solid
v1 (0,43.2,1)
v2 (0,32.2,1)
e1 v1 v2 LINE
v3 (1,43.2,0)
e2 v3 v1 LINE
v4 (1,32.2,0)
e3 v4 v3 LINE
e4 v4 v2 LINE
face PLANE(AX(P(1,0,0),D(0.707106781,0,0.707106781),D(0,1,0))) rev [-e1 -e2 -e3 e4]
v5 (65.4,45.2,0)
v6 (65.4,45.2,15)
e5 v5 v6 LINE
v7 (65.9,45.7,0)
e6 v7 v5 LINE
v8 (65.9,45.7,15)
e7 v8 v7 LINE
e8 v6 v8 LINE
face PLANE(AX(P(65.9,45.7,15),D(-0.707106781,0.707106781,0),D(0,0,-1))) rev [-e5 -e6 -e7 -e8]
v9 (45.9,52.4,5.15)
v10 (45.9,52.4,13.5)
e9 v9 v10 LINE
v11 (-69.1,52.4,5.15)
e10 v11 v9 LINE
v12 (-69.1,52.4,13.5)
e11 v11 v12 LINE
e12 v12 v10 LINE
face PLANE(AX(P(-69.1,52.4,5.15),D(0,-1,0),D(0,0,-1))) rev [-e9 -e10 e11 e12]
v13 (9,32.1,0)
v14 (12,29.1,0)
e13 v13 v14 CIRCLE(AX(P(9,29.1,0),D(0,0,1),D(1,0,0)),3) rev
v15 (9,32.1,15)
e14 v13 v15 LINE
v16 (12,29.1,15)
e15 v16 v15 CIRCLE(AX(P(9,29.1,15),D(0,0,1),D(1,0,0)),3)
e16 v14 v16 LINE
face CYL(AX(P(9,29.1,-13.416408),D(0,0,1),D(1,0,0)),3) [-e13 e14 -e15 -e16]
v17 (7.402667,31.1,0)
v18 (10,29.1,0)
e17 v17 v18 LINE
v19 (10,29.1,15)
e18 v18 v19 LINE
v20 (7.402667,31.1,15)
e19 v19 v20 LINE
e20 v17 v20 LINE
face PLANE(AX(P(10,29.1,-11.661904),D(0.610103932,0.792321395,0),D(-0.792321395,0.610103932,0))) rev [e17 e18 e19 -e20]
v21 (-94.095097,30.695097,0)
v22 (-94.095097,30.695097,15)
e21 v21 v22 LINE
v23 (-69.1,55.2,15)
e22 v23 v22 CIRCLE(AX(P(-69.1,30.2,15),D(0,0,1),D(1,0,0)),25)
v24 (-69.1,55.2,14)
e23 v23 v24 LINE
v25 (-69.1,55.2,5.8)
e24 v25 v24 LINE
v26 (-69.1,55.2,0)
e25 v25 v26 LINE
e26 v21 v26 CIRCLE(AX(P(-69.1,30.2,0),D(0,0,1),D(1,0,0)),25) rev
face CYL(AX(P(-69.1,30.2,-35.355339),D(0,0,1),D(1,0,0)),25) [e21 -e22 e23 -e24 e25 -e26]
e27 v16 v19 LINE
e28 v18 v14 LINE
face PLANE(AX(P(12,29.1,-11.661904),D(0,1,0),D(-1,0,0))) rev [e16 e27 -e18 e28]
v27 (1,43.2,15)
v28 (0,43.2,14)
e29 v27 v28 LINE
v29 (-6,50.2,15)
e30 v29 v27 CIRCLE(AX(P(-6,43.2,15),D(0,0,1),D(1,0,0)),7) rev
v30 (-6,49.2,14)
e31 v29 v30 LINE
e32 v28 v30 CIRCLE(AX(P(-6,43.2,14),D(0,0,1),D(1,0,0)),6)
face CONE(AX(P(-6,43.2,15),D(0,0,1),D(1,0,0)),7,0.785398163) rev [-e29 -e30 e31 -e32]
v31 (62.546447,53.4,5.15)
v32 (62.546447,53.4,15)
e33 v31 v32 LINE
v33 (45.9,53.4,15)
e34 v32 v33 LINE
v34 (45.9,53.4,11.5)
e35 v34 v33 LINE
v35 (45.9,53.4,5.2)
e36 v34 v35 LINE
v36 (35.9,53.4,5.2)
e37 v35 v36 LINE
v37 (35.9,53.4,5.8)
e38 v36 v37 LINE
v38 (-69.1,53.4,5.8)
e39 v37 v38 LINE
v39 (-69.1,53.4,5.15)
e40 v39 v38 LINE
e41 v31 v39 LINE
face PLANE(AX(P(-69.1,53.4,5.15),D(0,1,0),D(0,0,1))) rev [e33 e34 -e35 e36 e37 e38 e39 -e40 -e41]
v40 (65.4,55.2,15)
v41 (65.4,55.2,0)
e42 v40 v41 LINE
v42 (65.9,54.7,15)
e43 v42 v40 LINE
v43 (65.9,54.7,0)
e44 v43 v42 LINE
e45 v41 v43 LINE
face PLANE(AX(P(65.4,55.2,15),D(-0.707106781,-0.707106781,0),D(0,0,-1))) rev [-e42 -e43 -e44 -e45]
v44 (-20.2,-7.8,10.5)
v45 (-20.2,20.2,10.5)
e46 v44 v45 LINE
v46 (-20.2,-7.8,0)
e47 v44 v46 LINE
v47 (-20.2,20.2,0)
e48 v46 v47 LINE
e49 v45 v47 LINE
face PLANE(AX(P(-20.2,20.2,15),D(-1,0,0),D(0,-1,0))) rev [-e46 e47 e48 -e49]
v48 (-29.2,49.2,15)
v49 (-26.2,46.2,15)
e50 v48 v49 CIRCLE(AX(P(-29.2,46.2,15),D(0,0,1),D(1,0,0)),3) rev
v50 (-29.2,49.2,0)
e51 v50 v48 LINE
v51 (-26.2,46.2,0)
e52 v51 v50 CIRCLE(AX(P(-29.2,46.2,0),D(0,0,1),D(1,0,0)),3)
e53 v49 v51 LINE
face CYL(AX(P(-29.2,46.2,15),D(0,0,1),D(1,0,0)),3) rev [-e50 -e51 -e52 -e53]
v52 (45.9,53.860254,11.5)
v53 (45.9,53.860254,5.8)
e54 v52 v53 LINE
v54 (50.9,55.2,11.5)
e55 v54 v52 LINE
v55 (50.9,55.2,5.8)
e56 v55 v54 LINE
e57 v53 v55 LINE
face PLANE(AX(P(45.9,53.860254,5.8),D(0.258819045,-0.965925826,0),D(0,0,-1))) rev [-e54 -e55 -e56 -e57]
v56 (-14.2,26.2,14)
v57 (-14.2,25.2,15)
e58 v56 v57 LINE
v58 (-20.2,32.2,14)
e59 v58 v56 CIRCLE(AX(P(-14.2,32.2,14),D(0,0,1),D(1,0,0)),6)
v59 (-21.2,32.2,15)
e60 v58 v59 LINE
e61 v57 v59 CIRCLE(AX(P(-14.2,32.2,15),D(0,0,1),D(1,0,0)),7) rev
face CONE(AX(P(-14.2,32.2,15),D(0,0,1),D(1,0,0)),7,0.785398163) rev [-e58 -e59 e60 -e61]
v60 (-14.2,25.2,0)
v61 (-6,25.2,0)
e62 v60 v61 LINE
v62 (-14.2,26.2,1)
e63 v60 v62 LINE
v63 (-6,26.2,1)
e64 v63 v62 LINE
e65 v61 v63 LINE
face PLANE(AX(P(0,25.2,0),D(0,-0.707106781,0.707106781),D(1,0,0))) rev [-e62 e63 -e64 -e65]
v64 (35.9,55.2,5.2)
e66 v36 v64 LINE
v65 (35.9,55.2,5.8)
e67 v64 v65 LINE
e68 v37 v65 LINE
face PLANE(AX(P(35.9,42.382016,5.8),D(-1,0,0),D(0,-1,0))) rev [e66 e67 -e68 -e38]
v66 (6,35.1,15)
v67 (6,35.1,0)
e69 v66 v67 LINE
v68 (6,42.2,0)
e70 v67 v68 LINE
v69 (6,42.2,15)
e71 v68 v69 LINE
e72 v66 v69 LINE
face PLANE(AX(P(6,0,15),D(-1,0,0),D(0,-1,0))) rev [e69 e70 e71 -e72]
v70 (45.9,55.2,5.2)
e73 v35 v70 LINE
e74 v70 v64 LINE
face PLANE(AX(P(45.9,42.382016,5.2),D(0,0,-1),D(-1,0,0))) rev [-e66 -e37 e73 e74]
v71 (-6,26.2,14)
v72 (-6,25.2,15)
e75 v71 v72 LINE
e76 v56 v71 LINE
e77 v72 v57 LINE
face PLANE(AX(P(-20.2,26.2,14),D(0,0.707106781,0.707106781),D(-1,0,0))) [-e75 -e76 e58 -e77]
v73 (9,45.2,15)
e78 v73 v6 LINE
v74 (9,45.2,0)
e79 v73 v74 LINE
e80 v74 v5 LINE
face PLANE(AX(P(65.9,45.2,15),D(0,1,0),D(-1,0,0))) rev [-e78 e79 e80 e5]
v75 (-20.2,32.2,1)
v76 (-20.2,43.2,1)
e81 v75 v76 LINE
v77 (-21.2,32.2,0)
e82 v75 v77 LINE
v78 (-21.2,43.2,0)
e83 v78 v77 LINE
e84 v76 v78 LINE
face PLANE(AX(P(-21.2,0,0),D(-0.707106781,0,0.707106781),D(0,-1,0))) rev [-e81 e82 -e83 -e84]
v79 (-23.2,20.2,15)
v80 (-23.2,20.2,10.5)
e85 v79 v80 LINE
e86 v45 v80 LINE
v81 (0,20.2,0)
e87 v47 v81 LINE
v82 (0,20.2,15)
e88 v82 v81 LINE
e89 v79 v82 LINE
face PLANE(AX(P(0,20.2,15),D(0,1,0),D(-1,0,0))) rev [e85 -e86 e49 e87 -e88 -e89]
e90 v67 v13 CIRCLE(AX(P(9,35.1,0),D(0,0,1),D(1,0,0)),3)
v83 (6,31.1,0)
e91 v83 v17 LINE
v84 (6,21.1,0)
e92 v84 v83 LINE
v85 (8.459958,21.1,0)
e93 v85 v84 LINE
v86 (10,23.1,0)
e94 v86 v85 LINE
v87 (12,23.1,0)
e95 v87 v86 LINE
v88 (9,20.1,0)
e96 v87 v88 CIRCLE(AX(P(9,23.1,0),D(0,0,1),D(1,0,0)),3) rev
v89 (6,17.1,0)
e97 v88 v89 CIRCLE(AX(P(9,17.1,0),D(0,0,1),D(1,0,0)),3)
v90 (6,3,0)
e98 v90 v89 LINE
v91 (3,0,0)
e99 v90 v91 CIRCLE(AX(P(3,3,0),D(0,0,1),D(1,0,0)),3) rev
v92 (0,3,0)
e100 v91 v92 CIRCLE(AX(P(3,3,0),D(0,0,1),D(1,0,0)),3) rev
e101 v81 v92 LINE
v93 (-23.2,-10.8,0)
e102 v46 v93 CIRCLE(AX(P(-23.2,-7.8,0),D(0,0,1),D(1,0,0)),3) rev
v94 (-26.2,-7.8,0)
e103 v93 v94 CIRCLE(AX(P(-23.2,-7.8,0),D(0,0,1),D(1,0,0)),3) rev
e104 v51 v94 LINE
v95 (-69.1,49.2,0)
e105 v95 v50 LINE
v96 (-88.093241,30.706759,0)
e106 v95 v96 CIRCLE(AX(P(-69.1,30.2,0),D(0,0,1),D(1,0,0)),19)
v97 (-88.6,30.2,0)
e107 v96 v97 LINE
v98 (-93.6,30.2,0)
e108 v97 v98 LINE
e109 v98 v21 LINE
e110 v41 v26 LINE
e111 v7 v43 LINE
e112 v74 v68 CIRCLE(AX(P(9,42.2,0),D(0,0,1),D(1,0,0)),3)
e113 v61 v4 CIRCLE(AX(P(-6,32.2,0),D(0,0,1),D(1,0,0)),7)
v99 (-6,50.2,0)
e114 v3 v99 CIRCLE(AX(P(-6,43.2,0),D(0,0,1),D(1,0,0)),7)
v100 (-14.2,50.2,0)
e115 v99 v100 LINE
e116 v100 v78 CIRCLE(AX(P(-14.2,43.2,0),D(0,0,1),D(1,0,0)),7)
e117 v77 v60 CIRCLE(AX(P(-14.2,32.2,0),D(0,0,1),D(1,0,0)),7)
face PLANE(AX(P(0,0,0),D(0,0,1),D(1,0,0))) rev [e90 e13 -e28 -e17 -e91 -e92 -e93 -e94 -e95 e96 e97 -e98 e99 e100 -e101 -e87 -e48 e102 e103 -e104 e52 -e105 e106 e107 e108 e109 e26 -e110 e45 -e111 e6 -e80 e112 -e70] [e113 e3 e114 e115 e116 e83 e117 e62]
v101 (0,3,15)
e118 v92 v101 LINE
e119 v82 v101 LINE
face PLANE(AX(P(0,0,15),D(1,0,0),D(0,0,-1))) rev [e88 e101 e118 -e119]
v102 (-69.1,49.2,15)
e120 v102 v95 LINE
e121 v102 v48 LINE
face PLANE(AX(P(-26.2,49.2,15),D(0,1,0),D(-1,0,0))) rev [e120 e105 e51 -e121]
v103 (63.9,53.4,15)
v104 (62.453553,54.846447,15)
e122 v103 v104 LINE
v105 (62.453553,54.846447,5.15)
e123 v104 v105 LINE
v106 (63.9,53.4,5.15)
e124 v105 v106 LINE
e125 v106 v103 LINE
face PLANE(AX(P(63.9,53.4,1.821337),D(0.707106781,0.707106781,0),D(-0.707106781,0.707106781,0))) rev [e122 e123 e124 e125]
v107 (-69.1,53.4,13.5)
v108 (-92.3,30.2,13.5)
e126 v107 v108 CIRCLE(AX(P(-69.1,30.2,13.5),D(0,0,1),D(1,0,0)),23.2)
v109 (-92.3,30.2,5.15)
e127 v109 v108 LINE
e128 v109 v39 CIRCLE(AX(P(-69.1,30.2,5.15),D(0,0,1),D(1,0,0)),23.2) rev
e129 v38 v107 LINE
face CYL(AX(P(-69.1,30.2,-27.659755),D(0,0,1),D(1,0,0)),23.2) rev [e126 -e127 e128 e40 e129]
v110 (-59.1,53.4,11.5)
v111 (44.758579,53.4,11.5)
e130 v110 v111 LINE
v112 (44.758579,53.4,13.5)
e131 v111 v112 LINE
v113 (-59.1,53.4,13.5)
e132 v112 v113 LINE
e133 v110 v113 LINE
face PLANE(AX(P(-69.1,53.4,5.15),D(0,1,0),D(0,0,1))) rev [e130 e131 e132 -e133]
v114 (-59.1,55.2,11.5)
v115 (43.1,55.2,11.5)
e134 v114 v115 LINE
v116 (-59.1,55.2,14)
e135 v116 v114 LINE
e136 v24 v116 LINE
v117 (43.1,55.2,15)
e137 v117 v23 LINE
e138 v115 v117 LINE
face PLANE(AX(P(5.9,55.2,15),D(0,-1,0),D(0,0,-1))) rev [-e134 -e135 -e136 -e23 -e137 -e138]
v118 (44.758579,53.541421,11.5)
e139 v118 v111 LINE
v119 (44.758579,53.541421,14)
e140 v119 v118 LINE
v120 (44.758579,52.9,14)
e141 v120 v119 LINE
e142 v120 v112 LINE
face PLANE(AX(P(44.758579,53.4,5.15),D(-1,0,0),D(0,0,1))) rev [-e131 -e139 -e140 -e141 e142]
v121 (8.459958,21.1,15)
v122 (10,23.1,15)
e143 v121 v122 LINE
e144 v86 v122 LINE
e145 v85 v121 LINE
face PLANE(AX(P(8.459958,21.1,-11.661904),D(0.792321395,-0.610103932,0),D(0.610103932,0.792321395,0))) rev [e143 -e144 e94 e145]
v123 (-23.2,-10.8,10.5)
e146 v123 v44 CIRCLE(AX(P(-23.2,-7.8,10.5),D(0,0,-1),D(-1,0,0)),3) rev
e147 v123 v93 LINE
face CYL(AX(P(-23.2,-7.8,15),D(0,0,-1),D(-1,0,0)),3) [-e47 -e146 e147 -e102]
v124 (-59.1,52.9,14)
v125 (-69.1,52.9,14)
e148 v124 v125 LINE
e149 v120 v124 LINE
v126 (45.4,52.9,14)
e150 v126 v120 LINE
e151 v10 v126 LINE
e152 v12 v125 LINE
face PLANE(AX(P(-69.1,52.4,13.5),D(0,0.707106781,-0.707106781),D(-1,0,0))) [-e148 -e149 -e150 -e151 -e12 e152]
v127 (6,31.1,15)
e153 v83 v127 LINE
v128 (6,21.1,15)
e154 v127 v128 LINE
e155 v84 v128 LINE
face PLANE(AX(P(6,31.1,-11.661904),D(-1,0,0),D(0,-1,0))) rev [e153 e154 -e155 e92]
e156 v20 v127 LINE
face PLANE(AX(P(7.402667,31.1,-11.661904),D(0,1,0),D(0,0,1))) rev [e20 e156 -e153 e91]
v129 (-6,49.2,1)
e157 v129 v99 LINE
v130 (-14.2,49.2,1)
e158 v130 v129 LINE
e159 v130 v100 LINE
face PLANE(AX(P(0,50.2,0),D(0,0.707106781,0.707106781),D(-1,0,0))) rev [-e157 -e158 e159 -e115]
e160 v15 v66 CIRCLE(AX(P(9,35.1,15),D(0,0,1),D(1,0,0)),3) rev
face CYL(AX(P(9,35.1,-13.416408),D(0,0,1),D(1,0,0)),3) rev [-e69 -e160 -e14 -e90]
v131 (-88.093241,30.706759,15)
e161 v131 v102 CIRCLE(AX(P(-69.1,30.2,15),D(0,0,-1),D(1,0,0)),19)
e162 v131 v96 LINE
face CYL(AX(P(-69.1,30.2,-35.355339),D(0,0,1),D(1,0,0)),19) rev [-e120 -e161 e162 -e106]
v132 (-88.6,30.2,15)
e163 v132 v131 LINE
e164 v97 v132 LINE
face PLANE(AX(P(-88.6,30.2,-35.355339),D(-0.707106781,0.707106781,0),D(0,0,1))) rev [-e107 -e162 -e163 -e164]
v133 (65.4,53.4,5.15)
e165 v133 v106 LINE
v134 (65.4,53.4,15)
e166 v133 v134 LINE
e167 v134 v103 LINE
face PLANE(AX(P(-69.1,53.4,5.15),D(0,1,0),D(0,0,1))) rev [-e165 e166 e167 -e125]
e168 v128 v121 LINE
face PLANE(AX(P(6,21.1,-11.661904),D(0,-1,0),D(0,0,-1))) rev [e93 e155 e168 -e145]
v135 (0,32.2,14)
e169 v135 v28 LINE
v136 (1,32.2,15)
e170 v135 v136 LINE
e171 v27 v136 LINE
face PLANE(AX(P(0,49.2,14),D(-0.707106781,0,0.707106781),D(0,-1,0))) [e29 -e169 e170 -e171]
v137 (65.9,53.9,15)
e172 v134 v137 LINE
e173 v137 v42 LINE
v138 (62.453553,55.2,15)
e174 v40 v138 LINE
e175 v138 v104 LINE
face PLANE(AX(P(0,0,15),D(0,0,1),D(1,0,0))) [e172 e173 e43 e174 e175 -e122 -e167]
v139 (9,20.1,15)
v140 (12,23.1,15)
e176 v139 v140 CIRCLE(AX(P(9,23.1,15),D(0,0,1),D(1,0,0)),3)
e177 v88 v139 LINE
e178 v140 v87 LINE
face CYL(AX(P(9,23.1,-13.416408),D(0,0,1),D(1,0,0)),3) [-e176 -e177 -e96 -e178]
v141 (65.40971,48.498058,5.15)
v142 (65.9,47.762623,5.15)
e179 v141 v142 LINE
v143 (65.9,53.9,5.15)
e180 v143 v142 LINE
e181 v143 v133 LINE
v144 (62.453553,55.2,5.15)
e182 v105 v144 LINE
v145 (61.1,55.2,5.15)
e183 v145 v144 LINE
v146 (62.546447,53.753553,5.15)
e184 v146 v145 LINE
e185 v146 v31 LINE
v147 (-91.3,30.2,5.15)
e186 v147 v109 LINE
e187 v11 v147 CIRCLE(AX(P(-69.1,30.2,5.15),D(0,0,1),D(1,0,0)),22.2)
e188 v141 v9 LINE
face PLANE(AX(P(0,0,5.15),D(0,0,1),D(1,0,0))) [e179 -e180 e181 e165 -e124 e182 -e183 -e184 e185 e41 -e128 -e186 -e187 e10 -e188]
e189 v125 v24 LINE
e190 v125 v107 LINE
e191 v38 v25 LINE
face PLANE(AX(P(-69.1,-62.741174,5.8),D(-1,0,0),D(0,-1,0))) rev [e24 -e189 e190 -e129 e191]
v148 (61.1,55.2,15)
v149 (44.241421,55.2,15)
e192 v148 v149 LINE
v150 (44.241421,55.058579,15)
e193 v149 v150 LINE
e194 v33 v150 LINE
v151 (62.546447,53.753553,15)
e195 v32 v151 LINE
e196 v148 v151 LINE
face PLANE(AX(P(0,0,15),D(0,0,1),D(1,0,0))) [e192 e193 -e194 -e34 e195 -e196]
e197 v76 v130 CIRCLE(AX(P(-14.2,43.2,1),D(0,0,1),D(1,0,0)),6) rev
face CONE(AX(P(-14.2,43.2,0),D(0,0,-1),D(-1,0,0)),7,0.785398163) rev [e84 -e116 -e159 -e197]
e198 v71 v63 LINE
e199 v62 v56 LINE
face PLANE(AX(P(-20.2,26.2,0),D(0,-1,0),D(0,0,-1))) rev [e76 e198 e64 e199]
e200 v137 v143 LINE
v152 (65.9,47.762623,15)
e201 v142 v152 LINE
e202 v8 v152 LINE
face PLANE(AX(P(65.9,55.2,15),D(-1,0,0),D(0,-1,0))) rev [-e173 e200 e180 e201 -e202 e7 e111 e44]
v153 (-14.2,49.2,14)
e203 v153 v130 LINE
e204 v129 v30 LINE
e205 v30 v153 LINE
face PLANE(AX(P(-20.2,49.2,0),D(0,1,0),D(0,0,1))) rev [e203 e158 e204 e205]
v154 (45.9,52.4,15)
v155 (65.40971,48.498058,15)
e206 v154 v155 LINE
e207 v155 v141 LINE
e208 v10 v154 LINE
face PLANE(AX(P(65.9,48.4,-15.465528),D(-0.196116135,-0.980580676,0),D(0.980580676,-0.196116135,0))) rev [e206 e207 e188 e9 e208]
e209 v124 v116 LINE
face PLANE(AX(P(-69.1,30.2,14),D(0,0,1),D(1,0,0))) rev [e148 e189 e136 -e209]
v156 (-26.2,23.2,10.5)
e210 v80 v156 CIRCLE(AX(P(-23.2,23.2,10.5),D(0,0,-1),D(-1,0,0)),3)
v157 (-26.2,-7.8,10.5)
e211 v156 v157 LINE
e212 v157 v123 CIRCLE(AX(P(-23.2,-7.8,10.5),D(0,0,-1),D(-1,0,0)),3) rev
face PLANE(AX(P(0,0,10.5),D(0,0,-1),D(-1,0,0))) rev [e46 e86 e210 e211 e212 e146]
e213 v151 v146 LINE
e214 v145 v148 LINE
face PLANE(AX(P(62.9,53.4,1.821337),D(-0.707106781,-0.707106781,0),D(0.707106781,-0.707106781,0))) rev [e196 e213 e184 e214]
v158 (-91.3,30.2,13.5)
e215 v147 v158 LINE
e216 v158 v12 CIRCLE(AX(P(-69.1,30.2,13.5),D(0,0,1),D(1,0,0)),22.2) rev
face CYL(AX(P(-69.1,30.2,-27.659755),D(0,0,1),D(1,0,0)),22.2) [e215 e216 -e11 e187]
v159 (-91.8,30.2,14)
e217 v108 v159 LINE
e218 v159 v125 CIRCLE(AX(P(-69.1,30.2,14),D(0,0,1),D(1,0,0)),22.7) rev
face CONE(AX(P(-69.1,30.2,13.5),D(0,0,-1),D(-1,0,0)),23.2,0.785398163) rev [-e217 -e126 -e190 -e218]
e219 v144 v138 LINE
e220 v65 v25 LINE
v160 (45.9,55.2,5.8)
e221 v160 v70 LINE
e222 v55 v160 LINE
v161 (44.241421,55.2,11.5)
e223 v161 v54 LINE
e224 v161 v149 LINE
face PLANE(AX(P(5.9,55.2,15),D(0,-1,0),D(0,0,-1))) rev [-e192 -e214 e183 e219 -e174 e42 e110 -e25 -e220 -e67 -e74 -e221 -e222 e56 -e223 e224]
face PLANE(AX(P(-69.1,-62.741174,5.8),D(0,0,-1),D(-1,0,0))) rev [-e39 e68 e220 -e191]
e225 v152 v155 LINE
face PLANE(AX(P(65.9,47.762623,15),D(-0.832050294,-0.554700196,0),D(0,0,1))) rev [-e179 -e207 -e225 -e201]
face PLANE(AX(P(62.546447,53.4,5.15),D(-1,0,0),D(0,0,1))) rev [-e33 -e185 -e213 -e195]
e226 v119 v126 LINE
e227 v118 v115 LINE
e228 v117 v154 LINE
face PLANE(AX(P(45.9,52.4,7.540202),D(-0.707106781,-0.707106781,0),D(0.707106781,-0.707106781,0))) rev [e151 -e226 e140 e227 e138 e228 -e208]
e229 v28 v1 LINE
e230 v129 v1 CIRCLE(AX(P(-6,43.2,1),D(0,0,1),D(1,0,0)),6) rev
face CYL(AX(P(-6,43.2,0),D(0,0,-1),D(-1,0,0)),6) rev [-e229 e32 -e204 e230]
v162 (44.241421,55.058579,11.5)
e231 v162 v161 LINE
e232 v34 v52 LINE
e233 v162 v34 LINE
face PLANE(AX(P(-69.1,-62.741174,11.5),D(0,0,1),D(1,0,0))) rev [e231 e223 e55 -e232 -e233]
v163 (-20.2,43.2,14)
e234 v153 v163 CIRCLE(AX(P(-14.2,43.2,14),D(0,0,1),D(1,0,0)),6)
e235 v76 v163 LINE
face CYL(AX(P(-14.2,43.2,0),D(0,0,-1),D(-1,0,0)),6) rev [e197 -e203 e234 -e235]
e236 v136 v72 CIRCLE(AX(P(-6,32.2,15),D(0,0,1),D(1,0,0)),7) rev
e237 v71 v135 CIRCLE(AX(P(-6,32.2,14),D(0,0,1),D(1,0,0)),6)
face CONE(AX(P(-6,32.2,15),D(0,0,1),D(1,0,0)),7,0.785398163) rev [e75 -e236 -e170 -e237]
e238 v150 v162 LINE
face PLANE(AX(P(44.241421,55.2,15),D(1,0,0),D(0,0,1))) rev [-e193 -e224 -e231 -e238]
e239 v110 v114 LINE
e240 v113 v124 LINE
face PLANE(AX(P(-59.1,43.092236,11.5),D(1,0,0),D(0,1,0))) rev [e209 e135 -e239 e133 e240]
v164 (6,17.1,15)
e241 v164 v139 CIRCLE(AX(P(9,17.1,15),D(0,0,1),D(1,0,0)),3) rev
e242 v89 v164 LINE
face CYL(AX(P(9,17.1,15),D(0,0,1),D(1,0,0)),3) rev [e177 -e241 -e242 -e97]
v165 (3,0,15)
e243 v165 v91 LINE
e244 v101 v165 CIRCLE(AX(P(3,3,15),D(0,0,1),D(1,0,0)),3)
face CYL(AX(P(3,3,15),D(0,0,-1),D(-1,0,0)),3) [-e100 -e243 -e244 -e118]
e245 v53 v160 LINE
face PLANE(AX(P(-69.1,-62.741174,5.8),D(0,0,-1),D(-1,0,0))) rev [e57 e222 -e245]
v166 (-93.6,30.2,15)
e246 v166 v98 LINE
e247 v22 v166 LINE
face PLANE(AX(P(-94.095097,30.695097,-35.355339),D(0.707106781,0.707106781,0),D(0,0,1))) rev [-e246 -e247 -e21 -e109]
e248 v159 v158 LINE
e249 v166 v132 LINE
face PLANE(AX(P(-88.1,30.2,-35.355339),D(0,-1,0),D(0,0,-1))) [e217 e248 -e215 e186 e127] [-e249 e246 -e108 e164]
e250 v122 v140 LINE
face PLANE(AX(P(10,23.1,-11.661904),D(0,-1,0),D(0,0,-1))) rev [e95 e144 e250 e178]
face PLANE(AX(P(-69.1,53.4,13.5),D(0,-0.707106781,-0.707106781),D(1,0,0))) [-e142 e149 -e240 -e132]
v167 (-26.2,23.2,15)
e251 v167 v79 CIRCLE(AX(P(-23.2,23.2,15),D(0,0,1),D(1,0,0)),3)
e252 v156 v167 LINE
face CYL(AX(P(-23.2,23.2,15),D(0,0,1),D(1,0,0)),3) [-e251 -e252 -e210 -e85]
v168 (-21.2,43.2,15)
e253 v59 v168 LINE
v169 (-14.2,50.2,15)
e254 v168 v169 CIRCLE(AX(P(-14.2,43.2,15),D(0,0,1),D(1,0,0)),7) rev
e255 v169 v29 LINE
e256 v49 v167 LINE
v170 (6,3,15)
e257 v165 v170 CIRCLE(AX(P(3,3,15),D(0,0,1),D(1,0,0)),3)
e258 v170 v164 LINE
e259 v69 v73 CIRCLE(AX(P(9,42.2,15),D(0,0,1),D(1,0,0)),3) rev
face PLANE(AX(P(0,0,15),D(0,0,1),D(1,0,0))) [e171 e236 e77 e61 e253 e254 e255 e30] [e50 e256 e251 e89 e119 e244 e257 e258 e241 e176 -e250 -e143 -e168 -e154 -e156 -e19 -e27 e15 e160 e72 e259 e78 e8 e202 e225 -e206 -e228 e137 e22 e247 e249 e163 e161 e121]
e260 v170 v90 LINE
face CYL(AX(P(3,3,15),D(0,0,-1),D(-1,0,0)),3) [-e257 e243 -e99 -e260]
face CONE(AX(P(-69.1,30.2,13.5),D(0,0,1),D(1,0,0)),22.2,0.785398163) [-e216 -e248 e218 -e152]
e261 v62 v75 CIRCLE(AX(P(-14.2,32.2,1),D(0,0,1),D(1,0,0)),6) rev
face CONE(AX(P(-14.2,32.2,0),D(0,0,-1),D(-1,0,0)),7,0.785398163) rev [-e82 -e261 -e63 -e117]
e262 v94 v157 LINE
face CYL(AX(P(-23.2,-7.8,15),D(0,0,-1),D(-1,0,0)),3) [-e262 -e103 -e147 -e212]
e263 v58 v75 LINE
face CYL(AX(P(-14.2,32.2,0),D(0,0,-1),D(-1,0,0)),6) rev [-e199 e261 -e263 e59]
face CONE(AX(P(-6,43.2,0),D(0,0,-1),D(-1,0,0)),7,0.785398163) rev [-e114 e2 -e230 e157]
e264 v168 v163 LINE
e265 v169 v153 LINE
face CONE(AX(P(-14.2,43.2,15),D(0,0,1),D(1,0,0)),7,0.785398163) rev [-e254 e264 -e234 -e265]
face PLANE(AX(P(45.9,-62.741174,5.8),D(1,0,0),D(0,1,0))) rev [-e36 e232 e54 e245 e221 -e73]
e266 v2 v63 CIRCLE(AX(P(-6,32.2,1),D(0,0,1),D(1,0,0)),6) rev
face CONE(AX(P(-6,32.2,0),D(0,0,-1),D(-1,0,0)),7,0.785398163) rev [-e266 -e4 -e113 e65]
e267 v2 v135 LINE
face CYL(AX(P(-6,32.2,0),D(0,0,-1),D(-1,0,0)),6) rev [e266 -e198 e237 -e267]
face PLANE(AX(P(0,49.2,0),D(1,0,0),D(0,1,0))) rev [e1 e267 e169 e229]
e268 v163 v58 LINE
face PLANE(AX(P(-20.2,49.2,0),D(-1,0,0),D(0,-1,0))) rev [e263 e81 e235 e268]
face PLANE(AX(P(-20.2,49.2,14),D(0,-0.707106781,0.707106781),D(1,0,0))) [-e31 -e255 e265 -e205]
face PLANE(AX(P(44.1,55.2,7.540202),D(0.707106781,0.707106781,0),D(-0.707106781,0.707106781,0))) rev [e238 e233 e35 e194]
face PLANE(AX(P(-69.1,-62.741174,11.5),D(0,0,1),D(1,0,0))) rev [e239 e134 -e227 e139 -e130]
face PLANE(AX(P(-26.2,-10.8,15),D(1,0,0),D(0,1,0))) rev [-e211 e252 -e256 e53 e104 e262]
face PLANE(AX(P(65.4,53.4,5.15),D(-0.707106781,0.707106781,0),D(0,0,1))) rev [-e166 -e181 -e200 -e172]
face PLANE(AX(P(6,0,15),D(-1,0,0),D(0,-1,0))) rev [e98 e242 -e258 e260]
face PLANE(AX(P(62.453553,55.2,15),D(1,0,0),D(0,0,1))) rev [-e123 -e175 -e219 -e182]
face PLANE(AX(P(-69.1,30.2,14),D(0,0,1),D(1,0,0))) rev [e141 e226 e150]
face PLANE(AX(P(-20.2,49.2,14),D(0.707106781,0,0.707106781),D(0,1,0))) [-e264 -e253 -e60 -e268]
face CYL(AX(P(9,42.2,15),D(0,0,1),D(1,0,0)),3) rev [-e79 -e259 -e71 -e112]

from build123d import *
from OCP.BRepFilletAPI import BRepFilletAPI_MakeChamfer

# Parameters (mm, degrees)
BOSS_EXTRUDE1_DEPTH = 15
BOSS_EXTRUDE2_DEPTH = 15
SKETCH6_W           = 115
SKETCH6_H           = 1
CUT_EXTRUDE2_DEPTH  = 9.85
CUT_EXTRUDE3_DEPTH  = 9.85
CUT_EXTRUDE4_DEPTH  = 9.85
BOSS_EXTRUDE3_DEPTH = 1
CUT_EXTRUDE5_REACH  = 117.913
SKETCH10_W          = 115
SKETCH10_H          = 5.7
SKETCH13_W          = 20.2
SKETCH13_H          = 23
CUT_EXTRUDE6_DEPTH  = 111.121977825
FILLET1_R           = 6
SKETCH14_W          = 6
SKETCH14_H          = 31
CUT_EXTRUDE7_DEPTH  = 4.5
FILLET2_R           = 3
SKETCH16_W          = 10
SKETCH16_H          = 2.5
CUT_EXTRUDE8_DEPTH  = 1.8
CHAMFER1_SIZE       = 0.5
CHAMFER1_SIZE_2     = 0.637377439
CHAMFER2_SIZE       = 1
CHAMFER3_SIZE       = 5
CHAMFER3_SIZE2      = 1.339745962
CUT_EXTRUDE12_REACH = 112.118
CHAMFER4_SIZE       = 0.2
CHAMFER4_SIZE_2     = 0.141421356
SKETCH25_W          = 6
SKETCH25_H          = 12
BOSS_EXTRUDE6_DEPTH = 15
FILLET4_START       = -1
FILLET4_DEPTH       = 16
FILLET4_2_DEPTH     = 15
CUT_EXTRUDE15_DEPTH = 15
CUT_EXTRUDE16_DEPTH = 9.85
CHAMFER5_SIZE       = 0.5
CHAMFER5_SIZE2      = 0.353553391
CHAMFER6_SIZE       = 0.5
SKETCH29_W          = 10
SKETCH29_H          = 0.6
CUT_EXTRUDE17_DEPTH = 2.8


with BuildPart() as part:
    # Sketch3 → Boss-Extrude1 (new body)
    with BuildSketch(Plane.XY):
        Polygon((0, 0), (0, 20.2), (-20.2, 20.2), (-20.2, -10.8), (-26.2, -10.8), (-26.2, 49.2), (-69.1, 49.2), (-69.1, 55.2), (5.9, 55.2), (65.9, 55.2), (65.9, 45.2), (6, 45.2), (6, 0), align=None)
    extrude(amount=BOSS_EXTRUDE1_DEPTH)

    # Sketch4 → Boss-Extrude2 (add)
    with BuildSketch(Plane.XY.offset(15)):
        with BuildLine():
            Line((-88.1, 30.2), (-94.1, 30.2))
            ThreePointArc((-94.1, 30.2), (-86.77766953, 47.87766953), (-69.1, 55.2))
            Line((-69.1, 55.2), (-69.1, 49.2))
            ThreePointArc((-69.1, 49.2), (-82.535028843, 43.635028843), (-88.1, 30.2))
        make_face()
    extrude(amount=-BOSS_EXTRUDE2_DEPTH)

    # Sketch6 → Cut-Extrude2 (cut)
    with BuildSketch(Plane.XY.offset(15)):
        with Locations((-11.6, 52.9)):
            Rectangle(SKETCH6_W, SKETCH6_H)
    extrude(amount=-CUT_EXTRUDE2_DEPTH, mode=Mode.SUBTRACT)

    # Sketch7 → Cut-Extrude3 (cut)
    with BuildSketch(Plane.XY.offset(15)):
        with BuildLine():
            Line((-92.3, 30.2), (-91.3, 30.2))
            ThreePointArc((-91.3, 30.2), (-84.797770542, 45.897770542), (-69.1, 52.4))
            Line((-69.1, 52.4), (-69.1, 53.4))
            ThreePointArc((-69.1, 53.4), (-85.504877324, 46.604877324), (-92.3, 30.2))
        make_face()
    extrude(amount=-CUT_EXTRUDE3_DEPTH, mode=Mode.SUBTRACT)

    # Sketch8 → Cut-Extrude4 (cut)
    with BuildSketch(Plane.XY.offset(15)):
        Polygon((45.9, 53.4), (65.9, 53.4), (65.9, 48.4), (45.9, 52.4), align=None)
    extrude(amount=-CUT_EXTRUDE4_DEPTH, mode=Mode.SUBTRACT)

    # Sketch9 → Boss-Extrude3 (add)
    with BuildSketch(Plane.XY.offset(15)):
        with BuildLine():
            Line((-69.1, 52.4), (45.9, 52.4))
            Line((45.9, 52.4), (45.9, 53.4))
            Line((45.9, 53.4), (-69.1, 53.4))
            ThreePointArc((-69.1, 53.4), (-85.504877324, 46.604877324), (-92.3, 30.2))
            Line((-92.3, 30.2), (-91.3, 30.2))
            ThreePointArc((-91.3, 30.2), (-84.797770542, 45.897770542), (-69.1, 52.4))
        make_face()
    extrude(amount=-BOSS_EXTRUDE3_DEPTH)

    # Cut-Extrude5: up to this face of the body (flat: up to its plane)
    cut_extrude5_end = Plane(part.part.faces().sort_by_distance((-11.6, 52.4, 9.575))[0])
    # Sketch10 → Cut-Extrude5 (cut, up to the picked face)
    with BuildSketch(Plane(origin=(0, 55.2, 0), x_dir=(-1, 0, 0), z_dir=(0, 1, 0)), mode=Mode.PRIVATE) as cut_extrude5_sk1:
        with Locations((11.6, 8.65)):
            Rectangle(SKETCH10_W, SKETCH10_H)
    cut_extrude5_tool1 = split(extrude(cut_extrude5_sk1.sketch, amount=-CUT_EXTRUDE5_REACH, mode=Mode.PRIVATE), bisect_by=cut_extrude5_end, keep=Keep.BOTH, mode=Mode.PRIVATE)
    add(cut_extrude5_tool1.solids().sort_by(Axis((-11.6, 55.2, 8.65), (0, -1, 0)))[0], mode=Mode.SUBTRACT)

    # Sketch13 → Cut-Extrude6 (cut, through all)
    with BuildSketch(Plane.XY.offset(15)):
        with Locations((-10.1, 37.7)):
            Rectangle(SKETCH13_W, SKETCH13_H)
    extrude(amount=-CUT_EXTRUDE6_DEPTH, mode=Mode.SUBTRACT)

    # Fillet1
    fillet1_edges = [part.edges().sort_by_distance(p)[0] for p in [
        (-20.2, 26.2, 7.5),
        (-20.2, 49.2, 7.5),
        (0, 49.2, 7.5),
        (0, 26.2, 7.5),
    ]]
    fillet(fillet1_edges, radius=FILLET1_R)

    # Sketch14 → Cut-Extrude7 (cut)
    with BuildSketch(Plane.XY.offset(15)):
        with Locations((-23.2, 4.7)):
            Rectangle(SKETCH14_W, SKETCH14_H)
    extrude(amount=-CUT_EXTRUDE7_DEPTH, mode=Mode.SUBTRACT)

    # Fillet2
    fillet2_edges = [part.edges().sort_by_distance(p)[0] for p in [
        (-26.2, 49.2, 7.5),
        (6, 45.2, 7.5),
        (-26.2, 20.2, 12.75),
        (6, 0, 7.5),
        (0, 0, 7.5),
        (-20.2, -10.8, 5.25),
        (-26.2, -10.8, 5.25),
    ]]
    fillet(fillet2_edges, radius=FILLET2_R - 0.0001)  # a hair under: the kernel refuses the full size

    # Sketch16 → Cut-Extrude8 (cut)
    with BuildSketch(Plane(origin=(0, 55.2, 0), x_dir=(-1, 0, 0), z_dir=(0, 1, 0))):
        with Locations((64.1, 12.75)):
            Rectangle(SKETCH16_W, SKETCH16_H)
    extrude(amount=-CUT_EXTRUDE8_DEPTH, mode=Mode.SUBTRACT)

    # Chamfer1
    # the kernel refuses this chamfer: 0.637377439, 0.5 mm, written as the material it takes off along each edge
    with BuildSketch(Plane(origin=(65.9, 55.2, -1.285841494), x_dir=(-1, 0, 0), z_dir=(0, 0, 1)), Plane(origin=(65.9, 45.2, -1.285841494), x_dir=(0, 1, 0), z_dir=(0, 0, 1))) as chamfer1_piece_1:
        Polygon((CHAMFER1_SIZE, 0), (0, CHAMFER1_SIZE), (0, 0), align=None)
    extrude(amount=17.571682988, mode=Mode.SUBTRACT)
    with BuildSketch(Plane(origin=(-88.1, 30.2, 16.303301327), x_dir=(-1, 0, 0), z_dir=(0, 0, -1))) as chamfer1_piece_2:
        with BuildLine():
            Line((CHAMFER1_SIZE, 0), (-0.006759226, 0.506759226))
            ThreePointArc((-0.006759226, 0.506759226), (-0.001786833, 0.26056951), (0, 0))
            Line((0, 0), (CHAMFER1_SIZE, 0))
        make_face()
    extrude(amount=17.606602654, mode=Mode.SUBTRACT)
    with BuildSketch(Plane(origin=(-94.1, 30.2, 16.285841494), x_dir=(1, 0, 0), z_dir=(0, 0, -1))) as chamfer1_piece_3:
        with BuildLine():
            Line((CHAMFER1_SIZE, 0), (0.004902903, -0.495097097))
            ThreePointArc((0.004902903, -0.495097097), (0.001296043, -0.254559377), (0, 0))
            Line((0, 0), (CHAMFER1_SIZE, 0))
        make_face()
    extrude(amount=17.571682988, mode=Mode.SUBTRACT)
    with BuildSketch(Plane(origin=(65.9, 53.4, 16.285841494), x_dir=(-1, 0, 0), z_dir=(0, 0, -1))) as chamfer1_piece_4:
        Polygon((CHAMFER1_SIZE, 0), (0, CHAMFER1_SIZE), (0, 0), align=None)
    extrude(amount=11.135841494, mode=Mode.SUBTRACT)
    with BuildSketch(Plane(origin=(65.9, 48.4, 16.646856161), x_dir=(-0.9805806756909208, 0.1961161351381813, 0), z_dir=(0, 0, -1))) as chamfer1_piece_5:
        Polygon((CHAMFER1_SIZE, 0), (-CHAMFER1_SIZE_2 * 0.196116135199, -CHAMFER1_SIZE_2 * 0.980580675997), (0, 0), align=None)
    extrude(amount=11.496856161, mode=Mode.SUBTRACT)

    # Chamfer2
    chamfer2_edges = [part.edges().sort_by_distance(p)[0] for p in [
        (-10.1, 49.2, 15),
        (-10.1, 49.2, 0),
        (0, 37.7, 15),
        (0, 37.7, 0),
        (-10.1, 26.2, 15),
        (-10.1, 26.2, 0),
        (-20.2, 37.7, 15),
        (-20.2, 37.7, 0),
        (-1.757359313, 47.442640687, 15),
        (-1.757359313, 47.442640687, 0),
        (-1.757359313, 27.957359313, 15),
        (-1.757359313, 27.957359313, 0),
        (-18.442640687, 27.957359313, 15),
        (-18.442640687, 27.957359313, 0),
        (-18.442640687, 47.442640687, 15),
        (-18.442640687, 47.442640687, 0),
    ]]
    chamfer(chamfer2_edges, length=CHAMFER2_SIZE)

    # Chamfer3
    chamfer3_edges = [part.edges().sort_by_distance(p)[0] for p in [
        (45.9, 55.2, 8.65),
    ]]
    chamfer3_side = [part.faces().sort_by_distance(p)[0] for p in [
        (64.046661535, 55.2, 7.5),
    ]]
    chamfer(chamfer3_edges, length=CHAMFER3_SIZE, length2=CHAMFER3_SIZE2, reference=chamfer3_side[0])

    # Cut-Extrude12: up to this face of the body (flat: up to its plane)
    cut_extrude12_end = Plane(part.part.faces().sort_by_distance((-5.656799941, 54.307895333, 11.5))[0])
    # Sketch20 → Cut-Extrude12 (cut, up to the picked face)
    with BuildSketch(Plane.XY.offset(15), mode=Mode.PRIVATE) as cut_extrude12_sk1:
        Polygon((45.9, 52.4), (43.1, 55.2), (44.1, 55.2), (45.9, 53.4), align=None)
    cut_extrude12_tool1 = split(extrude(cut_extrude12_sk1.sketch, amount=-CUT_EXTRUDE12_REACH, mode=Mode.PRIVATE), bisect_by=cut_extrude12_end, keep=Keep.BOTH, mode=Mode.PRIVATE)
    add(cut_extrude12_tool1.solids().sort_by(Axis((44.731884, 54.031884, 15), (0, 0, -1)))[0], mode=Mode.SUBTRACT)

    # Chamfer4
    # the kernel refuses this chamfer: 0.2, 0.141421356 mm, written as the material it takes off along each edge
    with BuildSketch(Plane(origin=(44.9, 53.4, 10.985663402), x_dir=(-0.7071067811865297, 0.7071067811865652, 0), z_dir=(0, 0, 1))) as chamfer4_piece_1:
        Polygon((CHAMFER4_SIZE, 0), (CHAMFER4_SIZE_2 * 0.707106782373, CHAMFER4_SIZE_2 * 0.707106782373), (0, 0), align=None)
    extrude(amount=3.014336598, mode=Mode.SUBTRACT)
    with BuildSketch(Plane(origin=(44.1, 55.2, 15.514336598), x_dir=(1, 0, 0), z_dir=(0, 0, -1))) as chamfer4_piece_2:
        Polygon((CHAMFER4_SIZE_2 * 1.00000000168, 0), (CHAMFER4_SIZE * 0.707106781187, CHAMFER4_SIZE * 0.707106781186), (0, 0), align=None)
    extrude(amount=4.528673195, mode=Mode.SUBTRACT)

    # Sketch25 → Boss-Extrude6 (add)
    with BuildSketch(Plane.XY.offset(15)):
        with Locations((9, 26.1)):
            Rectangle(SKETCH25_W, SKETCH25_H)
    extrude(amount=-BOSS_EXTRUDE6_DEPTH)

    # Fillet4: read off the stored shape, not the designer's step
    # Fillet4 outline → Fillet4 (cut)
    with BuildSketch(Plane.XY.offset(FILLET4_START)):
        with BuildLine():
            ThreePointArc((9, 32.1), (11.121320344, 31.221320344), (12, 29.1))
            Line((12, 29.1), (12, 32.1))
            Line((12, 32.1), (9, 32.1))
        make_face()
        with BuildLine():
            ThreePointArc((12, 23.1), (11.121320344, 20.978679656), (9, 20.1))
            Line((9, 20.1), (12, 20.1))
            Line((12, 20.1), (12, 23.1))
        make_face()
    extrude(amount=FILLET4_DEPTH, mode=Mode.SUBTRACT)

    # Fillet4 2 outline → Fillet4 2 (add)
    with BuildSketch(Plane.XY):
        with BuildLine():
            Line((6, 32.1), (9, 32.1))
            ThreePointArc((9, 32.1), (6.878679656, 32.978679656), (6, 35.1))
            Line((6, 35.1), (6, 32.1))
        make_face()
        with BuildLine():
            ThreePointArc((6, 17.1), (6.878679656, 19.221320344), (9, 20.1))
            Line((9, 20.1), (6, 20.1))
            Line((6, 20.1), (6, 17.1))
        make_face()
    extrude(amount=FILLET4_2_DEPTH)

    # Sketch26 → Cut-Extrude15 (cut)
    with BuildSketch(Plane.XY.offset(15)):
        Polygon((12, 29.1), (10, 29.1), (7.402667467, 31.1), (6, 31.1), (6, 21.1), (8.459958458, 21.1), (10, 23.1), (12, 23.1), align=None)
    extrude(amount=-CUT_EXTRUDE15_DEPTH, mode=Mode.SUBTRACT)

    # Sketch27 → Cut-Extrude16 (cut)
    with BuildSketch(Plane.XY.offset(15)):
        Polygon((62.9, 53.4), (61.1, 55.2), (62.1, 55.2), (63.9, 53.4), align=None)
    extrude(amount=-CUT_EXTRUDE16_DEPTH, mode=Mode.SUBTRACT)

    # Chamfer5: one chamfer whose edges measure the first distance from different faces: ONE call of the kernel's chamfer builder (chamfer() names one face for all edges)
    chamfer5_edges_1 = [part.edges().sort_by_distance(p)[0] for p in [
        (62.9, 53.4, 10.075),
    ]]
    chamfer5_side_1 = [part.faces().sort_by_distance(p)[0] for p in [
        (62, 54.3, 10.075),
    ]]
    chamfer5_edges_2 = [part.edges().sort_by_distance(p)[0] for p in [
        (62.1, 55.2, 10.075),
    ]]
    chamfer5_side_2 = [part.faces().sort_by_distance(p)[0] for p in [
        (63, 54.3, 10.075),
    ]]
    chamfer5 = BRepFilletAPI_MakeChamfer(part.part.solid().wrapped)
    for e in chamfer5_edges_1:
        chamfer5.Add(CHAMFER5_SIZE, CHAMFER5_SIZE2, e.wrapped, chamfer5_side_1[0].wrapped)  # the first distance lies on this face
    for e in chamfer5_edges_2:
        chamfer5.Add(CHAMFER5_SIZE, CHAMFER5_SIZE2, e.wrapped, chamfer5_side_2[0].wrapped)  # the first distance lies on this face
    add(Compound.cast(chamfer5.Shape()), mode=Mode.REPLACE)

    # Chamfer6
    chamfer6_edges = [part.edges().sort_by_distance(p)[0] for p in [
        (-7.170710678, 53.4, 14),
        (-11.6, 52.4, 14),
        (-84.797770542, 45.897770542, 14),
        (-85.504877324, 46.604877324, 14),
    ]]
    chamfer(chamfer6_edges, length=CHAMFER6_SIZE - 0.0001)  # a hair under: the kernel refuses the full size

    # Sketch29 → Cut-Extrude17 (cut)
    with BuildSketch(Plane(origin=(0, 55.2, 0), x_dir=(-1, 0, 0), z_dir=(0, 1, 0))):
        with Locations((-40.9, 5.5)):
            Rectangle(SKETCH29_W, SKETCH29_H)
    extrude(amount=-CUT_EXTRUDE17_DEPTH, mode=Mode.SUBTRACT)


solid = part.part
